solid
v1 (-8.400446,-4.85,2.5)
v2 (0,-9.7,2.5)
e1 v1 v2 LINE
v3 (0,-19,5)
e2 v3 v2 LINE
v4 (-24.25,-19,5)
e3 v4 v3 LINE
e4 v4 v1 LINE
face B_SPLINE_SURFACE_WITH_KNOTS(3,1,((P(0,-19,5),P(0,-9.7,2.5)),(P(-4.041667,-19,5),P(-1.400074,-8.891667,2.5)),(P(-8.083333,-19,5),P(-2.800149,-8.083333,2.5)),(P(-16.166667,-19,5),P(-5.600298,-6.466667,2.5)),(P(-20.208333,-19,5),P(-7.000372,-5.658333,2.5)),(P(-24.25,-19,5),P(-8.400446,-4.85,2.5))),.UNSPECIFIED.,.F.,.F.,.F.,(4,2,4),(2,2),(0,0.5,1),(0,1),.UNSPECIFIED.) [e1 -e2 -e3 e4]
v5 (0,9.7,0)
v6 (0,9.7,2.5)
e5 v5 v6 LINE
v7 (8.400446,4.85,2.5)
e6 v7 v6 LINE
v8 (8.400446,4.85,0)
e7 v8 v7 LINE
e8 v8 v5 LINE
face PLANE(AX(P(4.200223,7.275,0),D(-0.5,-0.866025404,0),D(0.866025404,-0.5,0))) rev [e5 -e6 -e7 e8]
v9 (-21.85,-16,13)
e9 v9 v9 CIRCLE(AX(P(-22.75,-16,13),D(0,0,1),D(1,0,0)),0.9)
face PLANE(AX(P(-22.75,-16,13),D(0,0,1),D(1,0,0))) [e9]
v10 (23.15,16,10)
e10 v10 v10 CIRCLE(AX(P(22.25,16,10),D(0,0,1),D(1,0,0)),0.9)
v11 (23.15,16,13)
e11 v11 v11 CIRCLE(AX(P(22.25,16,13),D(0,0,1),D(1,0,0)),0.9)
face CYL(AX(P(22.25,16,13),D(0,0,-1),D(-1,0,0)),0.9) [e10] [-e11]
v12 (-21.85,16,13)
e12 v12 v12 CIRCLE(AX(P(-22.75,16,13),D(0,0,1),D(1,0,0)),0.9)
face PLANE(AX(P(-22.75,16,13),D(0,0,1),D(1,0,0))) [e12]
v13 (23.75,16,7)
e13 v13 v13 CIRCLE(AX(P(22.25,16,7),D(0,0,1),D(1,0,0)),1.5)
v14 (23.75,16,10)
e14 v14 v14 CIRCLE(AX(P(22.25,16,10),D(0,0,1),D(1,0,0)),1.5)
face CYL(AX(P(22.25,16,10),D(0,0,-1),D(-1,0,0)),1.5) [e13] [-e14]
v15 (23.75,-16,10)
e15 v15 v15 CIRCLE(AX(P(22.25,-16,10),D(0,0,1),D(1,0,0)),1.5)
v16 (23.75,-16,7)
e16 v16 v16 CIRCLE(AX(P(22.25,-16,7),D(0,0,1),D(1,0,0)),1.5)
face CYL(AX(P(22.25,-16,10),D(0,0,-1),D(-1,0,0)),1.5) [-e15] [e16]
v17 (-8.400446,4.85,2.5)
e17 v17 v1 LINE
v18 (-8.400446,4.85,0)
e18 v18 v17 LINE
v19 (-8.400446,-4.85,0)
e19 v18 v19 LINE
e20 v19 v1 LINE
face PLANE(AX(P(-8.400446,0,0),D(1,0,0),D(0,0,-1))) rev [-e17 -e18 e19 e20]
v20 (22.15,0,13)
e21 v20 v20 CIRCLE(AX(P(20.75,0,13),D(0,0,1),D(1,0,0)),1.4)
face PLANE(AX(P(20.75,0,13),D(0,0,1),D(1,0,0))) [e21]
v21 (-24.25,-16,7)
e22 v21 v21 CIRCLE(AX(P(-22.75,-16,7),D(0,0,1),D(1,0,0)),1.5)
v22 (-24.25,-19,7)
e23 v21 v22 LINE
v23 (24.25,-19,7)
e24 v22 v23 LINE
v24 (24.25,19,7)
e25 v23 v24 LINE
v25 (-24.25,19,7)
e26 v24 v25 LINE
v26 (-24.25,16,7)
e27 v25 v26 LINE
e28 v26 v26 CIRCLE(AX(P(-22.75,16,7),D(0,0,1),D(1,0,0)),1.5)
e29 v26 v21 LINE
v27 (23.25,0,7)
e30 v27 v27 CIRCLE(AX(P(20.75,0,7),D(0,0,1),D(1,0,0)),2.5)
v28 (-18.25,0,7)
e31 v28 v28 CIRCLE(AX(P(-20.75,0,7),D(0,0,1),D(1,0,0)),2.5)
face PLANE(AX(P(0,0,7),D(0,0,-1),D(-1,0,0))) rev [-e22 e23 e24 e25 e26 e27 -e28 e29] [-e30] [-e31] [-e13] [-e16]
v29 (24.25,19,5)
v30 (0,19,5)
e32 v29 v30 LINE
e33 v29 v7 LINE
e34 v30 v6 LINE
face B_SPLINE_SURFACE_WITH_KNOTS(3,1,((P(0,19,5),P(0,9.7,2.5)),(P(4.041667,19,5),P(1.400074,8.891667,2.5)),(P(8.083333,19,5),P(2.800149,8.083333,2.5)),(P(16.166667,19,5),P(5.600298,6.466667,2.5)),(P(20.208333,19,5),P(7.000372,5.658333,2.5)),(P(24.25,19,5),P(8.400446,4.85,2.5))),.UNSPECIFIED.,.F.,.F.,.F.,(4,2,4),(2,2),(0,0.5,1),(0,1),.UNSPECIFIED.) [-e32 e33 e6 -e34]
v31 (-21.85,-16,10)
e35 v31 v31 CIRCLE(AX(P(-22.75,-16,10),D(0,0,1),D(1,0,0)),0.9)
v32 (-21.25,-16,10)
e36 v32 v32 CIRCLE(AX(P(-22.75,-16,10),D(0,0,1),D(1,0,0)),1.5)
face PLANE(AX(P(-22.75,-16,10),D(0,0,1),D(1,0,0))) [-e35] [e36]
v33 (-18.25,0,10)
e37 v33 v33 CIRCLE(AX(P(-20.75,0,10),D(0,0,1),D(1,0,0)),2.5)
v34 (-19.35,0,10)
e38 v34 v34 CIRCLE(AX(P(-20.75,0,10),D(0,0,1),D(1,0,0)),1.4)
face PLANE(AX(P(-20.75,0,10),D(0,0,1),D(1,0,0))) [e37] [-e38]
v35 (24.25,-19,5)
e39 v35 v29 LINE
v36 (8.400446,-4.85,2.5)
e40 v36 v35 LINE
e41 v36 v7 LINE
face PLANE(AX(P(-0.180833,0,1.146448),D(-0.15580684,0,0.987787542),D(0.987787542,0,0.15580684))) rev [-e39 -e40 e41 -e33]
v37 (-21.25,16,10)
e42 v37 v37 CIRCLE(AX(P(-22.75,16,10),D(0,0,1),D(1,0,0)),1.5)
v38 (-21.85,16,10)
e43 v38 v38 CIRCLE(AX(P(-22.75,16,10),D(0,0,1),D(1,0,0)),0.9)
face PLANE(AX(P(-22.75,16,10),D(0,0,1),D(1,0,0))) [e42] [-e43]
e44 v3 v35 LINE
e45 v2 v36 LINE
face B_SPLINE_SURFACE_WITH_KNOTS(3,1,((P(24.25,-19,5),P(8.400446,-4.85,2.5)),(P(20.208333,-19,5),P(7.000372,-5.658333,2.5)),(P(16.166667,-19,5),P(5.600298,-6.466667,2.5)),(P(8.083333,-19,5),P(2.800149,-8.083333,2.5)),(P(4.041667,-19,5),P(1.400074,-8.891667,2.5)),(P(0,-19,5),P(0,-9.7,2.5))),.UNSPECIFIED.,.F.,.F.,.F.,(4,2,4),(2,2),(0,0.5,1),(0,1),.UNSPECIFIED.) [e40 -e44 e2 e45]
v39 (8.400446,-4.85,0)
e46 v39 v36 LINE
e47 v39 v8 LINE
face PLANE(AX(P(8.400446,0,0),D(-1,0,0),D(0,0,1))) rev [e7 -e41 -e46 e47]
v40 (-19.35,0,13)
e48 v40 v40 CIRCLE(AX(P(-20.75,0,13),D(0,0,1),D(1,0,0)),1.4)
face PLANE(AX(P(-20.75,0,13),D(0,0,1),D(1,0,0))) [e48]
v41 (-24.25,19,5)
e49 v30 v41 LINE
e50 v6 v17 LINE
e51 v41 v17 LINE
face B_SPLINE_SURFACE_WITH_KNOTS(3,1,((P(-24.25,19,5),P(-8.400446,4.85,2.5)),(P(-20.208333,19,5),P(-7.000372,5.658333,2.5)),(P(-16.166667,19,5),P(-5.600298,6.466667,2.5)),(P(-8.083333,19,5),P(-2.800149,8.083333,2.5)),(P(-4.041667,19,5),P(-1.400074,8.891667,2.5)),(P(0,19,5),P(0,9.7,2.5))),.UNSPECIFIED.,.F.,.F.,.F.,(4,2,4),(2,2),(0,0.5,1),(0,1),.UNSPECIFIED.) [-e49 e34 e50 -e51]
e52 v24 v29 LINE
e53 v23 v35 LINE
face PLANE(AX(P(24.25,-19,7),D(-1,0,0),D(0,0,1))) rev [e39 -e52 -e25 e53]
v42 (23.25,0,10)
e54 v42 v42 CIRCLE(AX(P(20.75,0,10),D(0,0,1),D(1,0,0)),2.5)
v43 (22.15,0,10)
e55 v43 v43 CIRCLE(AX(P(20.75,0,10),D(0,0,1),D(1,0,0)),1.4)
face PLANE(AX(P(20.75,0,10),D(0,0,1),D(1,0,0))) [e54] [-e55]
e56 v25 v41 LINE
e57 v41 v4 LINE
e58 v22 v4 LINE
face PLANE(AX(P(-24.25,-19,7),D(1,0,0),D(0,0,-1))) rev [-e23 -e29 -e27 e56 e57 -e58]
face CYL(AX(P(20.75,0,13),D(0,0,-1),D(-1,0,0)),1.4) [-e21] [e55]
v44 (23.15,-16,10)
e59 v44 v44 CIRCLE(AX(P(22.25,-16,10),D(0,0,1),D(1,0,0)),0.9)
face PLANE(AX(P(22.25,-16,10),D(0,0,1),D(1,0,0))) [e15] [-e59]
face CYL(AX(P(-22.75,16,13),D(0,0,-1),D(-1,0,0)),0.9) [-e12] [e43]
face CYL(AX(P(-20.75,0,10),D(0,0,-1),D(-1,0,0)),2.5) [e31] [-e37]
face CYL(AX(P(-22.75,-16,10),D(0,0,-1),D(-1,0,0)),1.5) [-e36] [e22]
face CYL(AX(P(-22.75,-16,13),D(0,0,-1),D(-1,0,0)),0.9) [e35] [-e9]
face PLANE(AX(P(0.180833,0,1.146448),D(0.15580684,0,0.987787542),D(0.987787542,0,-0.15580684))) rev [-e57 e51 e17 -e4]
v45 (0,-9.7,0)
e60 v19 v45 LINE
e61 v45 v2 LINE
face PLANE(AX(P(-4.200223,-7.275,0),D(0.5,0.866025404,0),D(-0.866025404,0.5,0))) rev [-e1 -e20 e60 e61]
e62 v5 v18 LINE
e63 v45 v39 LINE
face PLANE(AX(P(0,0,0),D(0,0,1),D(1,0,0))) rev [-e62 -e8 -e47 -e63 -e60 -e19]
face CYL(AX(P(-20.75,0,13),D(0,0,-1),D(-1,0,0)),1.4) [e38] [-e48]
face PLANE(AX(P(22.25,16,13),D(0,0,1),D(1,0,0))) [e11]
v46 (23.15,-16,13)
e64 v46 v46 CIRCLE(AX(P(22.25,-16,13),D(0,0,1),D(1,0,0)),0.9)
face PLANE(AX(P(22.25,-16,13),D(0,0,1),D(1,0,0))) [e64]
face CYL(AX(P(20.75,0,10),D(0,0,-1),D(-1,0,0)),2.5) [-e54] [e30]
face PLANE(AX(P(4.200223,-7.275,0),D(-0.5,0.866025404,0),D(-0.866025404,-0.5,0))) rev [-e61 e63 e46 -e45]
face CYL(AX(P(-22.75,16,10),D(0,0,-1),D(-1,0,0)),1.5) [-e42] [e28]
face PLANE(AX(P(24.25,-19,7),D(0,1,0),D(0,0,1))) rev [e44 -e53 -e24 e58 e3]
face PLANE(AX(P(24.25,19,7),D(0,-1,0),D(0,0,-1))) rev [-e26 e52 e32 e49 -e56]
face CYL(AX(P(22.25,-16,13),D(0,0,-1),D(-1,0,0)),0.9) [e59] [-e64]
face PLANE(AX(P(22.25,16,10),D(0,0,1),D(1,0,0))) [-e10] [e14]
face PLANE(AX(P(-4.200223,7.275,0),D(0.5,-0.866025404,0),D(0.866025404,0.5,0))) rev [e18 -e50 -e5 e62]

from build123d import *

# Parameters (mm, degrees)
SKIZZE2_2_W                     = 38
SKIZZE2_2_H                     = 48.5
AUFSATZ_LINEAR_AUSTRAGEN1_DEPTH = 2
SKIZZE4_R                       = 2.5
SKIZZE4_R_2                     = 1.5
AUFSATZ_LINEAR_AUSTRAGEN2_DEPTH = 3
SKIZZE5_R                       = 0.9
SKIZZE5_R_2                     = 1.4
AUFSATZ_LINEAR_AUSTRAGEN3_DEPTH = 3


with BuildPart() as part:
    # Skizze1 → Ausformung3 section 0
    with BuildSketch(Plane(origin=(0, 0, 0), x_dir=(0, 1, 0), z_dir=(0, 0, 1))):
        with BuildLine():
            Line((-4.85, 8.400446417), (-9.7, 0))
            Line((-9.7, 0), (-4.85, -8.400446417))
            Line((-4.85, -8.400446417), (4.85, -8.400446417))
            Line((4.85, -8.400446417), (9.7, 0))
            Line((9.7, 0), (4.85, 8.400446417))
            Line((4.85, 8.400446417), (-4.85, 8.400446417))
        make_face()
    # Skizze3 → Ausformung3 section 1
    with BuildSketch(Plane(origin=(0, 0, 2.5), x_dir=(0, 1, 0), z_dir=(0, 0, 1))):
        with BuildLine():
            Line((4.85, 8.400446417), (-4.85, 8.400446417))
            Line((-4.85, 8.400446417), (-9.7, 0))
            Line((-9.7, 0), (-4.85, -8.400446417))
            Line((-4.85, -8.400446417), (4.85, -8.400446417))
            Line((4.85, -8.400446417), (9.7, 0))
            Line((9.7, 0), (4.85, 8.400446417))
        make_face()
    loft()

    # Ausformung4: read off the stored shape, not the designer's step
    # Ausformung4: loft between two sections, ruled curve by curve
    ausformung4_from = [
        Edge.make_bspline([(24.25, -19, 5), (20.208333333, -19, 5), (16.166666667, -19, 5), (8.083333333, -19, 5), (4.041666667, -19, 5), (0, -19, 5)], [0, 0, 0, 0, 0.5, 0.5, 1, 1, 1, 1], 3),
        Edge.make_bspline([(0, -19, 5), (-4.041666667, -19, 5), (-8.083333333, -19, 5), (-16.166666667, -19, 5), (-20.208333333, -19, 5), (-24.25, -19, 5)], [0, 0, 0, 0, 0.5, 0.5, 1, 1, 1, 1], 3),
        Edge.make_bspline([(-24.25, 19, 5), (-20.208333333, 19, 5), (-16.166666667, 19, 5), (-8.083333333, 19, 5), (-4.041666667, 19, 5), (0, 19, 5)], [0, 0, 0, 0, 0.5, 0.5, 1, 1, 1, 1], 3),
        Edge.make_bspline([(0, 19, 5), (4.041666667, 19, 5), (8.083333333, 19, 5), (16.166666667, 19, 5), (20.208333333, 19, 5), (24.25, 19, 5)], [0, 0, 0, 0, 0.5, 0.5, 1, 1, 1, 1], 3),
        Edge.make_line((24.25, -19, 5), (24.25, 19, 5)),
        Edge.make_line((-24.25, 19, 5), (-24.25, -19, 5)),
    ]
    ausformung4_to = [
        Edge.make_bspline([(8.400446417, -4.85, 2.5), (7.000372014, -5.658333333, 2.5), (5.600297611, -6.466666667, 2.5), (2.800148806, -8.083333333, 2.5), (1.400074403, -8.891666667, 2.5), (0, -9.7, 2.5)], [0, 0, 0, 0, 0.5, 0.5, 1, 1, 1, 1], 3),
        Edge.make_bspline([(0, -9.7, 2.5), (-1.400074403, -8.891666667, 2.5), (-2.800148806, -8.083333333, 2.5), (-5.600297611, -6.466666667, 2.5), (-7.000372014, -5.658333333, 2.5), (-8.400446417, -4.85, 2.5)], [0, 0, 0, 0, 0.5, 0.5, 1, 1, 1, 1], 3),
        Edge.make_bspline([(-8.400446417, 4.85, 2.5), (-7.000372014, 5.658333333, 2.5), (-5.600297611, 6.466666667, 2.5), (-2.800148806, 8.083333333, 2.5), (-1.400074403, 8.891666667, 2.5), (0, 9.7, 2.5)], [0, 0, 0, 0, 0.5, 0.5, 1, 1, 1, 1], 3),
        Edge.make_bspline([(0, 9.7, 2.5), (1.400074403, 8.891666667, 2.5), (2.800148806, 8.083333333, 2.5), (5.600297611, 6.466666667, 2.5), (7.000372014, 5.658333333, 2.5), (8.400446417, 4.85, 2.5)], [0, 0, 0, 0, 0.5, 0.5, 1, 1, 1, 1], 3),
        Edge.make_line((8.400446417, -4.85, 2.5), (8.400446417, 4.85, 2.5)),
        Edge.make_line((-8.400446417, 4.85, 2.5), (-8.400446417, -4.85, 2.5)),
    ]
    ausformung4 = Solid(Shell([*[Face.make_surface_from_curves(ausformung4_from[k], ausformung4_to[k]) for k in range(6)], Face(Wire(ausformung4_from)), Face(Wire(ausformung4_to))]))
    add(ausformung4)

    # Skizze2<2> → Aufsatz-Linear austragen1 (add)
    with BuildSketch(Plane(origin=(0, 0, 5), x_dir=(0, 1, 0), z_dir=(0, 0, 1))):
        Rectangle(SKIZZE2_2_W, SKIZZE2_2_H)
    extrude(amount=AUFSATZ_LINEAR_AUSTRAGEN1_DEPTH)

    # Skizze4 → Aufsatz-Linear austragen2 (add)
    with BuildSketch(Plane.XY.offset(7)):
        with Locations((-20.75, 0)):
            Circle(SKIZZE4_R)
        with Locations((20.75, 0)):
            Circle(SKIZZE4_R)
        with Locations(Location((-22.75, 16, 0), (0, 0, 180))):
            Circle(SKIZZE4_R_2)
        with Locations(Location((-22.75, -16, 0), (0, 0, 180))):
            Circle(SKIZZE4_R_2)
        with Locations((22.25, 16)):
            Circle(SKIZZE4_R_2)
        with Locations((22.25, -16)):
            Circle(SKIZZE4_R_2)
    extrude(amount=AUFSATZ_LINEAR_AUSTRAGEN2_DEPTH)

    # Skizze5 → Aufsatz-Linear austragen3 (add)
    with BuildSketch(Plane.XY.offset(10)):
        with Locations((-22.75, 16)):
            Circle(SKIZZE5_R)
        with Locations((-22.75, -16)):
            Circle(SKIZZE5_R)
        with Locations((-20.75, 0)):
            Circle(SKIZZE5_R_2)
        with Locations((20.75, 0)):
            Circle(SKIZZE5_R_2)
        with Locations((22.25, 16)):
            Circle(SKIZZE5_R)
        with Locations((22.25, -16)):
            Circle(SKIZZE5_R)
    extrude(amount=AUFSATZ_LINEAR_AUSTRAGEN3_DEPTH)


solid = part.part
